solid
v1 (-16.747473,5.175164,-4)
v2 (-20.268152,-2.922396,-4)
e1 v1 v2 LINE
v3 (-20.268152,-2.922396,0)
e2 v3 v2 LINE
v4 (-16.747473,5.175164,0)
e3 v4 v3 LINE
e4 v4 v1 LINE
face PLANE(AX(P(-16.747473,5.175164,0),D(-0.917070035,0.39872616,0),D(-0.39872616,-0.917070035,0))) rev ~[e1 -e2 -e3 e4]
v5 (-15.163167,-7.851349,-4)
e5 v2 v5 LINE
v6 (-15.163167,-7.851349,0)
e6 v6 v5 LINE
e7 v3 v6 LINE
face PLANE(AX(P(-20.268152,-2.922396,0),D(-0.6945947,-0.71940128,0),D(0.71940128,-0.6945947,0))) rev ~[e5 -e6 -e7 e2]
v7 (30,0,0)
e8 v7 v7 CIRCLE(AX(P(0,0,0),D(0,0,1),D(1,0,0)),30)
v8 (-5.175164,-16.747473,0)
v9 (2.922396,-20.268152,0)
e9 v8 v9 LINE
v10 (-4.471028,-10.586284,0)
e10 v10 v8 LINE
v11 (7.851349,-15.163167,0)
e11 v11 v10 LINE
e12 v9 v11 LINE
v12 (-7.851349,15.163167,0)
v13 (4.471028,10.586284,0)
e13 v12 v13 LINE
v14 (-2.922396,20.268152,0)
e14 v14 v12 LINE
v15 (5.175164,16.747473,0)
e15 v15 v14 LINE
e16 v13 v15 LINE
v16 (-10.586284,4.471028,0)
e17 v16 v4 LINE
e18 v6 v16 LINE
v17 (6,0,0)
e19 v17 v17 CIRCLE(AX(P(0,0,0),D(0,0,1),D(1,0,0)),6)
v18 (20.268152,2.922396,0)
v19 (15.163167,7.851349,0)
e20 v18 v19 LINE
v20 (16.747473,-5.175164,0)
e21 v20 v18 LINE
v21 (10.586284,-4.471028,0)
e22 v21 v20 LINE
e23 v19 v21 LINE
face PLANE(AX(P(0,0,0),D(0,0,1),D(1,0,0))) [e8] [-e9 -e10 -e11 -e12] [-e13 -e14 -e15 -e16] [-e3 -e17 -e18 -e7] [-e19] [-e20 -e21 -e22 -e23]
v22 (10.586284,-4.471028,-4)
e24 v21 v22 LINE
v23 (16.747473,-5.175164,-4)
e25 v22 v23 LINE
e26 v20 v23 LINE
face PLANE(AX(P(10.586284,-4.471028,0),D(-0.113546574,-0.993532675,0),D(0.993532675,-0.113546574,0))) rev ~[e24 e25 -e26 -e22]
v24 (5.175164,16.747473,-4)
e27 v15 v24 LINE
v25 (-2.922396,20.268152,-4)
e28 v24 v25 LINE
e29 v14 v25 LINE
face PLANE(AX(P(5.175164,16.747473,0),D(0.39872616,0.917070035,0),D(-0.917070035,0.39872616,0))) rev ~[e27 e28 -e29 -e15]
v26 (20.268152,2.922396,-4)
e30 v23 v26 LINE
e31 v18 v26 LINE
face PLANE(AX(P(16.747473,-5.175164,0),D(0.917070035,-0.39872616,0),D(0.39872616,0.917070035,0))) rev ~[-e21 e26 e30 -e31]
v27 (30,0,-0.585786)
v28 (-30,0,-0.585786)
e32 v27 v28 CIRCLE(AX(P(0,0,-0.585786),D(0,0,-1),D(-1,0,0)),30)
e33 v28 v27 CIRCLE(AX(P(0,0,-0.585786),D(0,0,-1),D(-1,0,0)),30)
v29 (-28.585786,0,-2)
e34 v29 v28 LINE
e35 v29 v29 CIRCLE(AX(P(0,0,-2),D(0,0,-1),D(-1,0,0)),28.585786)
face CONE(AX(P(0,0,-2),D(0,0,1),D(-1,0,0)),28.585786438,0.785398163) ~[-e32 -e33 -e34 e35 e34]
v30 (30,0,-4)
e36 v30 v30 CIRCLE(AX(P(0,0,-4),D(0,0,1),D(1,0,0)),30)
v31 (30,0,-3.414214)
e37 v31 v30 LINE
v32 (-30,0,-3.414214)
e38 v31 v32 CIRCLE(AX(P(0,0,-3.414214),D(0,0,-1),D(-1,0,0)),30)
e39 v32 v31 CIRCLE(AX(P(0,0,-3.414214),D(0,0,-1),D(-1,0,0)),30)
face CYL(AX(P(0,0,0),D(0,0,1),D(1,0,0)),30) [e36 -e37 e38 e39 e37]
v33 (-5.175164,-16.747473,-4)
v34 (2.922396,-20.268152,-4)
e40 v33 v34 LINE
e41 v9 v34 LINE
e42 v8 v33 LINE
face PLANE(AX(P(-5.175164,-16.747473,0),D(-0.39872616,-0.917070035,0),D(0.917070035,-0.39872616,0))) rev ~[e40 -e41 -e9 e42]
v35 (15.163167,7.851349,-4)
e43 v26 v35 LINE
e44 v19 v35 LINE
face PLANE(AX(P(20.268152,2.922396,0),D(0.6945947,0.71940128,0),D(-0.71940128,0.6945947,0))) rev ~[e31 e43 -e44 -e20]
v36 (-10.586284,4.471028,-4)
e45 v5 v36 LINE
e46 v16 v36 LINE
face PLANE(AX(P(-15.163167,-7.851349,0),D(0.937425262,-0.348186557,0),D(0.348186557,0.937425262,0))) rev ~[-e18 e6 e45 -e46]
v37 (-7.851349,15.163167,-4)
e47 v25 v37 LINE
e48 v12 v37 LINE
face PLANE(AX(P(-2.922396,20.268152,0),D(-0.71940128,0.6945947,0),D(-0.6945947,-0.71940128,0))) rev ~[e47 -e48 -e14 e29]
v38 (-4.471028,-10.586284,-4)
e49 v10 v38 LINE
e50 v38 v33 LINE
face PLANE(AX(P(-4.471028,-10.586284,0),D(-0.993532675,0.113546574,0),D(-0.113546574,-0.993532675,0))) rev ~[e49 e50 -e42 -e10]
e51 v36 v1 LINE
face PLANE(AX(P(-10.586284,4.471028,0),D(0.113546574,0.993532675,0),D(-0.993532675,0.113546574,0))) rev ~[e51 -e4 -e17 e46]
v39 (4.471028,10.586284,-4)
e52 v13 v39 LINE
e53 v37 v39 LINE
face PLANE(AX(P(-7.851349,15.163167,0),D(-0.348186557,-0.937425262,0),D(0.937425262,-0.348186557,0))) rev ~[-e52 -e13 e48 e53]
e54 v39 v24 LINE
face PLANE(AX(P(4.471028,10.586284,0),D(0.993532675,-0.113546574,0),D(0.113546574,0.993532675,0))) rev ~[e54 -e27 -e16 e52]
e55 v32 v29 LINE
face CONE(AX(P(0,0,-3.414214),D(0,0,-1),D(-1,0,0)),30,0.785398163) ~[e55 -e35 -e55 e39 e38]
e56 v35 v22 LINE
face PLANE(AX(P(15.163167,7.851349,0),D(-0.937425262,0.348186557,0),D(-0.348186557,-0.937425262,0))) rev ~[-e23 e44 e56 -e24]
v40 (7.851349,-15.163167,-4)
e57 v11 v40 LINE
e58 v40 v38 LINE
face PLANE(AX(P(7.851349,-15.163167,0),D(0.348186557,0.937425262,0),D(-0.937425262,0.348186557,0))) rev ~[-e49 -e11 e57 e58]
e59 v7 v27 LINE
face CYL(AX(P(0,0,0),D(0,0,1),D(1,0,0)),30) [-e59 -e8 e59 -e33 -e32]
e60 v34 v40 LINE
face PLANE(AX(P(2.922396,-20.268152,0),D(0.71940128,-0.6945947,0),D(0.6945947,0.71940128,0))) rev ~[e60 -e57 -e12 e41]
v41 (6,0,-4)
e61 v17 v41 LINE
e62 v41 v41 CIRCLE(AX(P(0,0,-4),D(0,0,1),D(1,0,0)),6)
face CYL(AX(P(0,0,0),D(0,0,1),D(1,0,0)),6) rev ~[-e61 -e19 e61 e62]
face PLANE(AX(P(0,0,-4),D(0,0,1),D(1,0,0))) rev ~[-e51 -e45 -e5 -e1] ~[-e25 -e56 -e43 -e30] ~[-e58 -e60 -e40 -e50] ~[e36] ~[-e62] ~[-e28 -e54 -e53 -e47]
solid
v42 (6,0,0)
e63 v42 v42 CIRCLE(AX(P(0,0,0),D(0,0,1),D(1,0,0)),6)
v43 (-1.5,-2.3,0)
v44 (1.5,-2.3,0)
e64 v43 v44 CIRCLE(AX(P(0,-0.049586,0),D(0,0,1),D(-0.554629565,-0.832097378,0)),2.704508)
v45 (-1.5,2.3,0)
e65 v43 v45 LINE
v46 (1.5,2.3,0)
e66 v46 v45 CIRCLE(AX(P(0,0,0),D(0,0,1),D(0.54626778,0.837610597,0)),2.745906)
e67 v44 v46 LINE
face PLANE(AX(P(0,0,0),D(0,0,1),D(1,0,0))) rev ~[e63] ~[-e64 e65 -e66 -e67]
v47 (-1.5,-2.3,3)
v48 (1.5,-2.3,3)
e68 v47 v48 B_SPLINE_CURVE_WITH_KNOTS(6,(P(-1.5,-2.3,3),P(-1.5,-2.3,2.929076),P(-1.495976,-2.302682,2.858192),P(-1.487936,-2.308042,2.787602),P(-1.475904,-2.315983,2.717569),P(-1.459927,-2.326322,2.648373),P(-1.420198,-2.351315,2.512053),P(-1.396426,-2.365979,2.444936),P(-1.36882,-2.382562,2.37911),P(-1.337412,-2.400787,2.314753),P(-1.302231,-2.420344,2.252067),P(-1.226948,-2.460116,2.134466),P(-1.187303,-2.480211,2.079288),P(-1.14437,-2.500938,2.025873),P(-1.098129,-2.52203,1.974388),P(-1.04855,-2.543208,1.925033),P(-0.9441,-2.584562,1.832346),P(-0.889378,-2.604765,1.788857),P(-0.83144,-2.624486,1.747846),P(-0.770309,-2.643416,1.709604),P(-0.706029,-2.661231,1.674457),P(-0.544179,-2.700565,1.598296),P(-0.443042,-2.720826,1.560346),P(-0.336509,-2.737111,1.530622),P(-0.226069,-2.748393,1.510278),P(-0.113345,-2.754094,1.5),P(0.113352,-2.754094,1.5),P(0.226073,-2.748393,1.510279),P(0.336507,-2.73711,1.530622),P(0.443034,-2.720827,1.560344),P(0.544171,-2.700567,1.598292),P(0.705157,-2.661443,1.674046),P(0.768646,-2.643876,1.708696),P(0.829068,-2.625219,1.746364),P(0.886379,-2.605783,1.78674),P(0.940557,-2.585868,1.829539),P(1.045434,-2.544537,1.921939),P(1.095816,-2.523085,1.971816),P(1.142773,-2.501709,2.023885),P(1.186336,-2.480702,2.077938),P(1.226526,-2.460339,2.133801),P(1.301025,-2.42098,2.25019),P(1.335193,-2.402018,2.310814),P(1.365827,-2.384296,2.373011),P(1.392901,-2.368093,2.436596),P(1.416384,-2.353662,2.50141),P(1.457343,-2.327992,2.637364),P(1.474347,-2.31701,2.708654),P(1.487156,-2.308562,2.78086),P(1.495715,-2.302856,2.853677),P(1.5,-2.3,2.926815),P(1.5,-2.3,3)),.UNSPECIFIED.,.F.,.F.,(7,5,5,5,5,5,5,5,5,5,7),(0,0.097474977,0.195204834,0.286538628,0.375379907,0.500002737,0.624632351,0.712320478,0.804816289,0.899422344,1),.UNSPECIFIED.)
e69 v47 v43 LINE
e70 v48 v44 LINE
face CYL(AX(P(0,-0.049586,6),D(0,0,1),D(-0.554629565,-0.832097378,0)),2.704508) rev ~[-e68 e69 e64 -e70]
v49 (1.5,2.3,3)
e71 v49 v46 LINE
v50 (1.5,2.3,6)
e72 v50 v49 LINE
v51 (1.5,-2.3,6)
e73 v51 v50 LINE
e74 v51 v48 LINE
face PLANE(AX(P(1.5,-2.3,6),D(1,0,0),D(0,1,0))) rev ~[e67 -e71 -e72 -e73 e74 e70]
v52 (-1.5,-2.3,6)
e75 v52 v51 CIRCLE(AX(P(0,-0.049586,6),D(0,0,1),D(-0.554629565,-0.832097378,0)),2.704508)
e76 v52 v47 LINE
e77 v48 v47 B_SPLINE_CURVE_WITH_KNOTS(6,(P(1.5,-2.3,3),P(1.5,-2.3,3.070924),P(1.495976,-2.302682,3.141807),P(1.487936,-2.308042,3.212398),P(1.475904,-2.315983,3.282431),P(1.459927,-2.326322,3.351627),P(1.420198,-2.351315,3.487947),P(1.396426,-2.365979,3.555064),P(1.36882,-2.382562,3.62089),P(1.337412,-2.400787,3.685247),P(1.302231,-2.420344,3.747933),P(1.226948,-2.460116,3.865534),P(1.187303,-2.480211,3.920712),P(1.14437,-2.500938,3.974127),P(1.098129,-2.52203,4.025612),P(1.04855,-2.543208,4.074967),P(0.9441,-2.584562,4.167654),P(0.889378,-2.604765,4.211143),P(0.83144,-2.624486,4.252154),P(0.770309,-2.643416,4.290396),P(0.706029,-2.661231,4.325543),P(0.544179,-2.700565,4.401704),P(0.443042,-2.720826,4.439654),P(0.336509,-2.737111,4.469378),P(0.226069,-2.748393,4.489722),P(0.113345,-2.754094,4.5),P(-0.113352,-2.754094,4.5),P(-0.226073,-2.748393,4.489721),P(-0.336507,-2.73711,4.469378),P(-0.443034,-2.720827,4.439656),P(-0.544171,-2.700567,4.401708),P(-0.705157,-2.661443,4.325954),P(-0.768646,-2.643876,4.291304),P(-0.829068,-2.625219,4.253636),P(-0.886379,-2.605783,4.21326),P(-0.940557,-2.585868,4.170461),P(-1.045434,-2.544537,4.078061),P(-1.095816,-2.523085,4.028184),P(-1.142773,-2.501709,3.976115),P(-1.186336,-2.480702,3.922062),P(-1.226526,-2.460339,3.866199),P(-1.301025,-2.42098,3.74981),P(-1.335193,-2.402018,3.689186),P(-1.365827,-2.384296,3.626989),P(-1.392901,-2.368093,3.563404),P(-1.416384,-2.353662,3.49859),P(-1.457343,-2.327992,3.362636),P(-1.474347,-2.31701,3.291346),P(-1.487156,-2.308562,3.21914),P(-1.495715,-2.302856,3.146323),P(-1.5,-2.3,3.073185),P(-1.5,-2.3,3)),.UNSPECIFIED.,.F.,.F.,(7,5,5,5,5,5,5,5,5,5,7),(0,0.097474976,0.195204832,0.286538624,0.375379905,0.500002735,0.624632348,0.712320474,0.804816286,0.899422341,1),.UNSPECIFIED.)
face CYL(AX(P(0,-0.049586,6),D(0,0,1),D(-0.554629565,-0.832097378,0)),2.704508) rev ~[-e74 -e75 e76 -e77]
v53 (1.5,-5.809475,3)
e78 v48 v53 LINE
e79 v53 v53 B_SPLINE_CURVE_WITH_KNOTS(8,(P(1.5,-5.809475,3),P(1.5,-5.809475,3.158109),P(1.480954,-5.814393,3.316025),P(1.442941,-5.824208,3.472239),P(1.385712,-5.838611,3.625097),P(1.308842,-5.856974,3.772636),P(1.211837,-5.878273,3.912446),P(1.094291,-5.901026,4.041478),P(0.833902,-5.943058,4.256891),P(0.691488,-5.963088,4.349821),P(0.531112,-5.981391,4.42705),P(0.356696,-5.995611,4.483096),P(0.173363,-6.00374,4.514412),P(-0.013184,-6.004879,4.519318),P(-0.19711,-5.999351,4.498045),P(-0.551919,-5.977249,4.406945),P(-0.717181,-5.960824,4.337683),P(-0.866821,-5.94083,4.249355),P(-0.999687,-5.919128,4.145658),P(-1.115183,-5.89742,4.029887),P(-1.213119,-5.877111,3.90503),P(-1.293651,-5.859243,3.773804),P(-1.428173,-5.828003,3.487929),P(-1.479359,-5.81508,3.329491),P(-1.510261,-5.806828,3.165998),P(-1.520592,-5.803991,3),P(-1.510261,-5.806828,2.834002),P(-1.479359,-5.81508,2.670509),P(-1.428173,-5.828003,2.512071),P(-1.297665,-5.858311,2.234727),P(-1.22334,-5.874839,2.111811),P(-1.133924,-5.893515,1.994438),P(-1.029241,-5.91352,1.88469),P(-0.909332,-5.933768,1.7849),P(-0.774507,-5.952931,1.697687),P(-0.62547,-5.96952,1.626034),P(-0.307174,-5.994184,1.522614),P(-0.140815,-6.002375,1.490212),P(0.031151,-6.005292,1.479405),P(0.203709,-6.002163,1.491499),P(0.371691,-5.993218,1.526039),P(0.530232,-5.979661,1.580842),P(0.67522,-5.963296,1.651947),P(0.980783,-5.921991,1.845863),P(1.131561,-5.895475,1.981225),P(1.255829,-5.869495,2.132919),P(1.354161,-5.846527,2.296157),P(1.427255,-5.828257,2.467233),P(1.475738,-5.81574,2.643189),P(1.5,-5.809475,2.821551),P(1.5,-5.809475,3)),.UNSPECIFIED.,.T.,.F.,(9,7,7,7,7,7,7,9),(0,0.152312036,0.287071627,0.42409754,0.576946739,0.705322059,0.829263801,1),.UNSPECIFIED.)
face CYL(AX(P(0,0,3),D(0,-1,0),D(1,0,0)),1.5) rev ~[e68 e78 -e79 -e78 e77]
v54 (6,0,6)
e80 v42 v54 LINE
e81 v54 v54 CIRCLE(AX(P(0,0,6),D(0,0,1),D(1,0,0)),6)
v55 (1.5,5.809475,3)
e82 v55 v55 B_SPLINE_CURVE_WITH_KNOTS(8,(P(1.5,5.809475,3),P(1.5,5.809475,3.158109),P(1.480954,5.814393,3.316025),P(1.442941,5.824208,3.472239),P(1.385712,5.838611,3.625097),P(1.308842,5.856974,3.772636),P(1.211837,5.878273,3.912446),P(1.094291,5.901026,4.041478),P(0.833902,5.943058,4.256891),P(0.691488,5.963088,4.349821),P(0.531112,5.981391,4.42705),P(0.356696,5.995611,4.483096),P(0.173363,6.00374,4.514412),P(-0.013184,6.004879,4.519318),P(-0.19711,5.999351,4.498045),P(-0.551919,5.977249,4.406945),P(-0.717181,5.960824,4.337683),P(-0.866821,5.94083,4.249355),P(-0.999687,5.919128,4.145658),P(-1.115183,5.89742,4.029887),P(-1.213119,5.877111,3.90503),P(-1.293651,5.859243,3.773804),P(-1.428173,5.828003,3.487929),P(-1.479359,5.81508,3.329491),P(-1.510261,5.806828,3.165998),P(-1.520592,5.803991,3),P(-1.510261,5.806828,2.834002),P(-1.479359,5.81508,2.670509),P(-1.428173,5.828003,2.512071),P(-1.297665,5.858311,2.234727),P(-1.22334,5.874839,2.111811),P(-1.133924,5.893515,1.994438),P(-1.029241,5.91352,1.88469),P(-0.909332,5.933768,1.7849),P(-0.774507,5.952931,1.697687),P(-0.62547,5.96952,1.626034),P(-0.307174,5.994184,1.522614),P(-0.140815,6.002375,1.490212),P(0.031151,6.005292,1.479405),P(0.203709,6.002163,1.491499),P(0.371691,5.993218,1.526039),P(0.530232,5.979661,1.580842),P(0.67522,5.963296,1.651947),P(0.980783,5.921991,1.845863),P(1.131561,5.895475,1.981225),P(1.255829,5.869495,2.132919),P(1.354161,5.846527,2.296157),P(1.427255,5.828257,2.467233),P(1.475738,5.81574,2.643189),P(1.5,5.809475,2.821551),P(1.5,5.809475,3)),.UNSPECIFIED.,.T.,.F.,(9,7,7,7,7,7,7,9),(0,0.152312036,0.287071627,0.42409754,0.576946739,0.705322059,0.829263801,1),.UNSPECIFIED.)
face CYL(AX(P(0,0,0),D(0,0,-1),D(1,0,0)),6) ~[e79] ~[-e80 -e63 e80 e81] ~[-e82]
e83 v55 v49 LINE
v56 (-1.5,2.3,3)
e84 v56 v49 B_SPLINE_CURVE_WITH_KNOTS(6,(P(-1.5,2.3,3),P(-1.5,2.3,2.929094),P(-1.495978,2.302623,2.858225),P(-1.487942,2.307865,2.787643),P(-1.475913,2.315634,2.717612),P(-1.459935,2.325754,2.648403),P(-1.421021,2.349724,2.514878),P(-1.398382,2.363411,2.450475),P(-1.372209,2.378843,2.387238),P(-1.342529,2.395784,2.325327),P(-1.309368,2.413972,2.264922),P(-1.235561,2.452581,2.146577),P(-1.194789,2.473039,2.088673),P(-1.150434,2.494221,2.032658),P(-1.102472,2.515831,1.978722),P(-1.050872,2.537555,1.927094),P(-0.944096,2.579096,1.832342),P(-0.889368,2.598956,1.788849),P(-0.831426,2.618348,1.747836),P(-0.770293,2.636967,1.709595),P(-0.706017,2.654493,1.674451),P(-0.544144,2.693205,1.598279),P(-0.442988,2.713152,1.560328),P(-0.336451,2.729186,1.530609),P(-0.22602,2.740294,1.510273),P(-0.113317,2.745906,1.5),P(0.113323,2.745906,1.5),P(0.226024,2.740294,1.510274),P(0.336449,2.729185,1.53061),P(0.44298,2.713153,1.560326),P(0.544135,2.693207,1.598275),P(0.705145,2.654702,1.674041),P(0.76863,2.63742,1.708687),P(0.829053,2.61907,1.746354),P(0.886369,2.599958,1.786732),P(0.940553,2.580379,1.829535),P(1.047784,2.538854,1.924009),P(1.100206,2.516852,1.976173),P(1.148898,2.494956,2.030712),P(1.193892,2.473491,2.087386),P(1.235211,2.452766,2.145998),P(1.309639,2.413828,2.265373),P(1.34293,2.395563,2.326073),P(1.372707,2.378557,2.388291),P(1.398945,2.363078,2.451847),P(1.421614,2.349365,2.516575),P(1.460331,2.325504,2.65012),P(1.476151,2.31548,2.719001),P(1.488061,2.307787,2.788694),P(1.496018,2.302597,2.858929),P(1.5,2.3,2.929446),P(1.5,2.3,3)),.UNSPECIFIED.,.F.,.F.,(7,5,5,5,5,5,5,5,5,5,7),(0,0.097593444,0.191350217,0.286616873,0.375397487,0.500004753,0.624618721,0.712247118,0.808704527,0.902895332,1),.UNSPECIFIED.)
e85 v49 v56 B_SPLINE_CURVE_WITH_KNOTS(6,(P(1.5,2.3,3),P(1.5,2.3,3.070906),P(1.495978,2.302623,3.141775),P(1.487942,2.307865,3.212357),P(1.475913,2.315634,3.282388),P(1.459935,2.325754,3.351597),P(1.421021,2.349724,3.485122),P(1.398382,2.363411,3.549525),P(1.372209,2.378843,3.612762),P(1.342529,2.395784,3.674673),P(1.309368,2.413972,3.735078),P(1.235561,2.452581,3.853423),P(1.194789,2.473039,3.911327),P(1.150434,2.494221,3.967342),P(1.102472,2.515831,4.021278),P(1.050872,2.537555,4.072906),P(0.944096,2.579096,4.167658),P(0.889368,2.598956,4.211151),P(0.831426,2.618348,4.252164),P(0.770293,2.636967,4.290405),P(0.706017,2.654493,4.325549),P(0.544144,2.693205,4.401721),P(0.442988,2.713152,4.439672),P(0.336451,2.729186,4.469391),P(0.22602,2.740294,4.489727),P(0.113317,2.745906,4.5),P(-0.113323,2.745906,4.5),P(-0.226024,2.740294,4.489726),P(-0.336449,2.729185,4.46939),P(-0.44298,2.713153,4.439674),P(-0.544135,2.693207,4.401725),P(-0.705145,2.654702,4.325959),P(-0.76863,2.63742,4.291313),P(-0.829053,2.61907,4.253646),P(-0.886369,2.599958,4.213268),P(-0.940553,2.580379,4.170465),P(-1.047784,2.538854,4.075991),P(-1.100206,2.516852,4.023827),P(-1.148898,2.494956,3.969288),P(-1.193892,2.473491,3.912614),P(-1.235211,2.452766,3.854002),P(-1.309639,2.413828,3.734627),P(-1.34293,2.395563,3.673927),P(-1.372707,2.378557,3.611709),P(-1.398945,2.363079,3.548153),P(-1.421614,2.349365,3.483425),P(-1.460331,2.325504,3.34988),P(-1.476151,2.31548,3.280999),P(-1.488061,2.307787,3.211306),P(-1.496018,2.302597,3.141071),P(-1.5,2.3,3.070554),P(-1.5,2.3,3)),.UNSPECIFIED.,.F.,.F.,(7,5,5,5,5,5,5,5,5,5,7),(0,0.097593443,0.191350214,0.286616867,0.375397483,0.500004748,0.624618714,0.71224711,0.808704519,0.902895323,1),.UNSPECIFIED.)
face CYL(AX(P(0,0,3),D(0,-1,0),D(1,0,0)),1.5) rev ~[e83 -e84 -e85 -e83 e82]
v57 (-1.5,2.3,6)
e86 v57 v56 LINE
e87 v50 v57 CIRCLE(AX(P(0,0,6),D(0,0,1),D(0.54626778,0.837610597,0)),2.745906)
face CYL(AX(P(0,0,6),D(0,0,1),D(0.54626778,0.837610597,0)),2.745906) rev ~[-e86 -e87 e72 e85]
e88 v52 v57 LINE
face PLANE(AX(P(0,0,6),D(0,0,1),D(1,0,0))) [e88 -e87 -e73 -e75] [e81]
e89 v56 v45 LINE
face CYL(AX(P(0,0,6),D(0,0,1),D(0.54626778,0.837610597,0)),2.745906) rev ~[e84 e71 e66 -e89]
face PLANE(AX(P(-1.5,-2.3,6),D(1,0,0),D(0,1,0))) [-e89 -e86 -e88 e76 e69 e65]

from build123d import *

# Parameters (mm, degrees)
F0_R             = 30
F0_R_2           = 6
F1_DEPTH         = 4
F2_DEPTH         = 6
F3_R             = 1.5
F4_DEPTH         = 12.5
F5_W             = 3
F5_H             = 4.6
F6_DEPTH         = 9.4
F10_DEPTH        = 4
F10_COPIES_COUNT = 4


# Not quite as in the source:
# - a pattern or mirror of a feature is missing from the dataset's text; its kind, count and spacing are read off the source's solid


with BuildPart() as f1:
    # F0 (on Top) → F1 (new body)
    with BuildSketch(Plane.XY):
        Circle(F0_R)
        Circle(F0_R_2, mode=Mode.SUBTRACT)
    extrude(amount=-F1_DEPTH)

    # F7 (on Front) → F8 (revolve, cut)
    with BuildSketch(Plane.XZ):
        Polygon((-30, -0.5857864376), (-30, -3.4142135624), (-28.5857864376, -2), align=None)
    revolve(axis=Axis((0, 0, 1.4569712803), (0, 0, -1)), mode=Mode.SUBTRACT)

    # F9 (on face) → F10 (cut, through all)
    with BuildSketch(Plane.XY):
        Polygon((-2.9223964084, 20.2681515366), (-7.8513491899, 15.1631673798), (4.471027758, 10.586284101), (5.1751635037, 16.7474728078), align=None)
    f10 = extrude(amount=-F10_DEPTH, mode=Mode.SUBTRACT)

    # F10_copies: F10 ×4 about axis
    f10_copies_axis = Axis((0, 0, 0), (0, 0, 1))
    for i in range(1, F10_COPIES_COUNT):
        add(f10.rotate(f10_copies_axis, i * 360 / F10_COPIES_COUNT), mode=Mode.SUBTRACT)


with BuildPart() as f2:
    # F0 (on Top) → F2 (new body)
    with BuildSketch(Plane.XY):
        Circle(F0_R_2)
    extrude(amount=F2_DEPTH)

    # F3 (on Front) → F4 (cut, symmetric)
    with BuildSketch(Plane.XZ):
        with Locations((0, 3)):
            Circle(F3_R)
    extrude(amount=F4_DEPTH, both=True, mode=Mode.SUBTRACT)

    # F5 (on face) → F6 (cut)
    with BuildSketch(Plane.XY.offset(6)):
        Rectangle(F5_W, F5_H)
        with BuildLine():
            Line((1.5, -2.3), (-1.5, -2.3))
            ThreePointArc((-1.5, -2.3), (0, -2.7540939565), (1.5, -2.3))
        make_face()
        with BuildLine():
            ThreePointArc((1.5, 2.3), (0, 2.7459060435), (-1.5, 2.3))
            Line((-1.5, 2.3), (1.5, 2.3))
        make_face()
    extrude(amount=-F6_DEPTH, mode=Mode.SUBTRACT)


solid = Compound([f1.part, f2.part])
